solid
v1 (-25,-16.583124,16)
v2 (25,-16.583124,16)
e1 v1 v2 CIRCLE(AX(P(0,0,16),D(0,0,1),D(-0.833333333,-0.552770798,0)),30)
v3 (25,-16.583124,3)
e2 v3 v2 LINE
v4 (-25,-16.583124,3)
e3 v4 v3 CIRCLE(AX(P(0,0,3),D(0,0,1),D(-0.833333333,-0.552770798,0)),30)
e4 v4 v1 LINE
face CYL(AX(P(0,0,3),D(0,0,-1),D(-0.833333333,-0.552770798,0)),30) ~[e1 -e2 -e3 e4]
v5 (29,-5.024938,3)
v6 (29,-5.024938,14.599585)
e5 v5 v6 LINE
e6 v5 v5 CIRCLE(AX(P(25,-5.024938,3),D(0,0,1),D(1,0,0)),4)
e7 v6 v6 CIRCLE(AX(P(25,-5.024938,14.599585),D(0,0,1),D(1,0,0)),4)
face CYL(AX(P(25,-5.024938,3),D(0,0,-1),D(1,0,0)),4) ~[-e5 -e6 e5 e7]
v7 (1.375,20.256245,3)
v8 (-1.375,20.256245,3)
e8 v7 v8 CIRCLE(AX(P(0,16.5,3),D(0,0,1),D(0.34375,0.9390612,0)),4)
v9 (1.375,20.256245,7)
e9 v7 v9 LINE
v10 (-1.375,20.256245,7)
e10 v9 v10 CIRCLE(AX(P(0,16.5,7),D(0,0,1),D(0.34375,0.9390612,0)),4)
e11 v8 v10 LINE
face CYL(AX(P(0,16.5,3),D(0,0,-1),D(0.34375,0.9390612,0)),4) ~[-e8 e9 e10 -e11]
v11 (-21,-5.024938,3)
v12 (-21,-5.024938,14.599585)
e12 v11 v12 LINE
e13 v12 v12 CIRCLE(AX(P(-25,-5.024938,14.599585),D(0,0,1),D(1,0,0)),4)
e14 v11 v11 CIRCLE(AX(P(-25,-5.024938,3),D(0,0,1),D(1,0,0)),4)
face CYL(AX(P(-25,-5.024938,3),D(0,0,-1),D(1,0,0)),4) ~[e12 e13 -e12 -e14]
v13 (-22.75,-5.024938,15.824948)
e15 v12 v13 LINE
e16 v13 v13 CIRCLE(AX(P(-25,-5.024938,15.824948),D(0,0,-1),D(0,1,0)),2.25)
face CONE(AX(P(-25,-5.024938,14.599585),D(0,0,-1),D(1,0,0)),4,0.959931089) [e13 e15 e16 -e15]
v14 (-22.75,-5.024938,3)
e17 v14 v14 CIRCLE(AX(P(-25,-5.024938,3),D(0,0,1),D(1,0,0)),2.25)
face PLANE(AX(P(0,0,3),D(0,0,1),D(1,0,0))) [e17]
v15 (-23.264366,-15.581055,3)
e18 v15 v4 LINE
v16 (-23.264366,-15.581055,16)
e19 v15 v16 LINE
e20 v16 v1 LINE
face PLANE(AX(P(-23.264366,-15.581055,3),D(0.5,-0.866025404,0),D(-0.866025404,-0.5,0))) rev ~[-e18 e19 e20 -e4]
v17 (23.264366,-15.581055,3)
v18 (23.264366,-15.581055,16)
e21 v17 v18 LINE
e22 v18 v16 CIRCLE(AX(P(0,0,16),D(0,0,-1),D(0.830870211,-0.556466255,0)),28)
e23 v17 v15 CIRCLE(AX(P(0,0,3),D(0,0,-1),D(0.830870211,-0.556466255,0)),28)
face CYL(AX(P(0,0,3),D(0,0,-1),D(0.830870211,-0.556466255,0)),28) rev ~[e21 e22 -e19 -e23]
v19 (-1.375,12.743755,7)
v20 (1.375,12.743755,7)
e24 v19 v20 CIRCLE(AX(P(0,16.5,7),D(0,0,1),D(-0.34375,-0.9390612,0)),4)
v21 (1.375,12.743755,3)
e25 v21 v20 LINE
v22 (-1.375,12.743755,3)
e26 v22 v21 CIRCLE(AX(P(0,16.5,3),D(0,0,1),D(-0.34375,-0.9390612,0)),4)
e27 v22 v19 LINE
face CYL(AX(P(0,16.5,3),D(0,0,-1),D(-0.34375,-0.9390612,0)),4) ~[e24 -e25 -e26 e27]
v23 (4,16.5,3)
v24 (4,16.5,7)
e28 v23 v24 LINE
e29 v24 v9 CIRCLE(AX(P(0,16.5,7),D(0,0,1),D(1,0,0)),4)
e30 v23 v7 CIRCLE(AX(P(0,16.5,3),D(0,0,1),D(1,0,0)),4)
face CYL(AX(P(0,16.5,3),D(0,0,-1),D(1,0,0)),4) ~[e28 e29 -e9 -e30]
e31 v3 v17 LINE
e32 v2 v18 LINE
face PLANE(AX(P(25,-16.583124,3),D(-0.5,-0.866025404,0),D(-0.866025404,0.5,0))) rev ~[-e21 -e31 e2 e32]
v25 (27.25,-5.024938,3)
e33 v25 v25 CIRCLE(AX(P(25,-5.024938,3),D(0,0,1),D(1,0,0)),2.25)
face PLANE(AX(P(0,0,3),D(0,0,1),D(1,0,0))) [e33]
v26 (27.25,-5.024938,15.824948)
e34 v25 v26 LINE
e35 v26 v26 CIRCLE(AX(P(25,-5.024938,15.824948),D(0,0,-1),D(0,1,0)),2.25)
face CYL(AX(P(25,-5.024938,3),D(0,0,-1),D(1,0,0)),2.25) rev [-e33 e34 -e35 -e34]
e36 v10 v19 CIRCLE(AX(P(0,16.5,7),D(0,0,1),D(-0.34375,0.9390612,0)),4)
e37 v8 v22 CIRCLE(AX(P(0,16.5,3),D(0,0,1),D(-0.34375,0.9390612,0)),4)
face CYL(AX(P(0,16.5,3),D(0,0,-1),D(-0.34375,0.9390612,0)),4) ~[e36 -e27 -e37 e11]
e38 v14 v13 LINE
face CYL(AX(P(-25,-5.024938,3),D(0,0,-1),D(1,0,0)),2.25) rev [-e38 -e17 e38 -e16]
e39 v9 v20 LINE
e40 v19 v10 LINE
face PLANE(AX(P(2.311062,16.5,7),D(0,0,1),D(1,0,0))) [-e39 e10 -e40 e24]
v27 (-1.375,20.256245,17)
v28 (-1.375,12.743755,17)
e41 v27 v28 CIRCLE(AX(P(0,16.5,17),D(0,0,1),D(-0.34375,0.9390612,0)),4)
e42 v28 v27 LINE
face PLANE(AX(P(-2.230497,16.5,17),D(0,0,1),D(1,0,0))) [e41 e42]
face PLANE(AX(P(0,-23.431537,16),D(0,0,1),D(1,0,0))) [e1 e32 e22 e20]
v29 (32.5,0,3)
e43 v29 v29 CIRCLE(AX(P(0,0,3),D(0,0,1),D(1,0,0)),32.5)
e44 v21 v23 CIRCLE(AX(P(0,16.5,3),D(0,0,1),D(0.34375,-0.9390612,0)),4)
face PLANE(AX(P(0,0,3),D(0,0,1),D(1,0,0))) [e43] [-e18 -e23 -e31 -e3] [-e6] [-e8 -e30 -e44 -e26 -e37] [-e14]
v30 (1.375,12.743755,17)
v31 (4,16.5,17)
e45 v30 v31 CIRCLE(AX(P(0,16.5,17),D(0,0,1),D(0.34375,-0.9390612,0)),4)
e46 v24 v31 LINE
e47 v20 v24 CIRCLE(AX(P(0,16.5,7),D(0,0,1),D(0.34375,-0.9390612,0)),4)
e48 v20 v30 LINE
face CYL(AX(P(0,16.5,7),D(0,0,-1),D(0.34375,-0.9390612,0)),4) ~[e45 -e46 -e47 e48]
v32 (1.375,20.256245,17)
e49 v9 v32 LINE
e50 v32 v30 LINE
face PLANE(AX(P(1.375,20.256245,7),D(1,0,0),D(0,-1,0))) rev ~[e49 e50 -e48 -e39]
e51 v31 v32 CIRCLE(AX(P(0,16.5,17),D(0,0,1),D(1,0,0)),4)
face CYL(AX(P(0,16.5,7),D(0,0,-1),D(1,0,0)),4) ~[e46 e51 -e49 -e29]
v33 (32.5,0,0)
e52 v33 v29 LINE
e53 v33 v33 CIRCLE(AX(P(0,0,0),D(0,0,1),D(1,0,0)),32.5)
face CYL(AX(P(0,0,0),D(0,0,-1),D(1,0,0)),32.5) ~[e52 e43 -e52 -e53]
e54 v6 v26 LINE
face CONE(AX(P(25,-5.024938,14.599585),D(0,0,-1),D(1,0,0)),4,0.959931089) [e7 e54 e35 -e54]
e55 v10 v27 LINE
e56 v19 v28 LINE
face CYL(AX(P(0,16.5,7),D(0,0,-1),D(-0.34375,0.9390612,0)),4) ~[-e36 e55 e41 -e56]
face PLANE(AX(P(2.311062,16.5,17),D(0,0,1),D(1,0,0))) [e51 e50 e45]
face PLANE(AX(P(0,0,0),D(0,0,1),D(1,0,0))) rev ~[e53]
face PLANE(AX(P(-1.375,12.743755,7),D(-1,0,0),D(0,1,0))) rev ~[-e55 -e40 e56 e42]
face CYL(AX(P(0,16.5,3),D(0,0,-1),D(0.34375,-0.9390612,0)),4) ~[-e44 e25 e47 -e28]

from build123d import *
from build123d import SkipClean  # not in build123d's __all__

# Parameters (mm, degrees)
F0_R     = 32.5
F0_R_2   = 4
F0_R_3   = 2.25
F1_DEPTH = 3
F2_START = 3
F2_DEPTH = 13
F3_START = 3
F3_DEPTH = 13
F5_START = 3
F5_DEPTH = 4
F6_START = 7
F6_DEPTH = 10


# Not quite as in the source:
# - a fillet or chamfer that OpenCascade refuses, or shapes differently, is made with other operations: its cross-section is extruded or revolved along the edge and cut away or added


with BuildPart() as f1:
    # F0 (on Top) → F1 (new body)
    with BuildSketch(Plane.XY):
        Circle(F0_R)
        with Locations((-25, -5.0249378106)):
            Circle(F0_R_2, mode=Mode.SUBTRACT)
        with BuildLine():
            ThreePointArc((25, -16.5831239518), (0, -30), (-25, -16.5831239518))
            Line((-25, -16.5831239518), (-23.2643659014, -15.5810551377))
            Line((-23.2643659014, -15.5810551377), (23.2643659014, -15.5810551377))
            Line((23.2643659014, -15.5810551377), (25, -16.5831239518))
        make_face(mode=Mode.SUBTRACT)
        with Locations((25, -5.0249378106)):
            Circle(F0_R_2, mode=Mode.SUBTRACT)
        with BuildLine():
            ThreePointArc((1.375, 20.2562448003), (3.2787192622, 18.7912878475), (4, 16.5))
            ThreePointArc((4, 16.5), (3.2787192622, 14.2087121525), (1.375, 12.7437551997))
            ThreePointArc((1.375, 12.7437551997), (0, 12.5), (-1.375, 12.7437551997))
            ThreePointArc((-1.375, 12.7437551997), (-4, 16.5), (-1.375, 20.2562448003))
            ThreePointArc((-1.375, 20.2562448003), (0, 20.5), (1.375, 20.2562448003))
        make_face(mode=Mode.SUBTRACT)
        with BuildLine():
            Line((23.2643659014, -15.5810551377), (-23.2643659014, -15.5810551377))
            ThreePointArc((-23.2643659014, -15.5810551377), (0, -28), (23.2643659014, -15.5810551377))
        make_face()
        with BuildLine():
            Line((-23.2643659014, -15.5810551377), (-25, -16.5831239518))
            ThreePointArc((-25, -16.5831239518), (0, -30), (25, -16.5831239518))
            Line((25, -16.5831239518), (23.2643659014, -15.5810551377))
            ThreePointArc((23.2643659014, -15.5810551377), (0, -28), (-23.2643659014, -15.5810551377))
        make_face()
        with Locations((25, -5.0249378106)):
            Circle(F0_R_2)
        with Locations((25, -5.0249378106)):
            Circle(F0_R_3, mode=Mode.SUBTRACT)
        with Locations((-25, -5.0249378106)):
            Circle(F0_R_2)
        with Locations((-25, -5.0249378106)):
            Circle(F0_R_3, mode=Mode.SUBTRACT)
        with BuildLine():
            Line((1.375, 12.7437551997), (1.375, 20.2562448003))
            ThreePointArc((1.375, 20.2562448003), (0, 20.5), (-1.375, 20.2562448003))
            Line((-1.375, 20.2562448003), (-1.375, 12.7437551997))
            ThreePointArc((-1.375, 12.7437551997), (0, 12.5), (1.375, 12.7437551997))
        make_face()
        with Locations((25, -5.0249378106)):
            Circle(F0_R_3)
        with Locations((-25, -5.0249378106)):
            Circle(F0_R_3)
        with BuildLine():
            ThreePointArc((1.375, 12.7437551997), (3.2787192622, 14.2087121525), (4, 16.5))
            ThreePointArc((4, 16.5), (3.2787192622, 18.7912878475), (1.375, 20.2562448003))
            Line((1.375, 20.2562448003), (1.375, 12.7437551997))
        make_face()
        with BuildLine():
            Line((-1.375, 12.7437551997), (-1.375, 20.2562448003))
            ThreePointArc((-1.375, 20.2562448003), (-4, 16.5), (-1.375, 12.7437551997))
        make_face()
    extrude(amount=F1_DEPTH)

    # F0 (on Top) → F2 (join)
    with BuildSketch(Plane.XY.offset(F2_START)):
        with BuildLine():
            Line((-23.2643659014, -15.5810551377), (-25, -16.5831239518))
            ThreePointArc((-25, -16.5831239518), (0, -30), (25, -16.5831239518))
            Line((25, -16.5831239518), (23.2643659014, -15.5810551377))
            ThreePointArc((23.2643659014, -15.5810551377), (0, -28), (-23.2643659014, -15.5810551377))
        make_face()
    extrude(amount=F2_DEPTH)

    # F0 (on Top) → F3 (join)
    with BuildSketch(Plane.XY.offset(F3_START)):
        with Locations((-25, -5.0249378106)):
            Circle(F0_R_2)
        with Locations((-25, -5.0249378106)):
            Circle(F0_R_3, mode=Mode.SUBTRACT)
        with Locations((25, -5.0249378106)):
            Circle(F0_R_2)
        with Locations((25, -5.0249378106)):
            Circle(F0_R_3, mode=Mode.SUBTRACT)
    extrude(amount=F3_DEPTH)

    # F4: chamfer of 2 x 1.4004150764 on 2 edges, made by hand

    # F4_s1 → F4_t2 (revolve, cut)
    with BuildSketch(Plane.XZ.offset(5.0249378106)):
        Polygon((-21, 14.5995849236), (-23, 16), (-21, 16), align=None)
    revolve(axis=Axis((-25, -5.0249378106, 16), (0, 0, 1)), mode=Mode.SUBTRACT)

    # F4_s3 → F4_t4 (revolve, cut)
    with BuildSketch(Plane.XZ.offset(5.0249378106)):
        Polygon((29, 14.5995849236), (27, 16), (29, 16), align=None)
    revolve(axis=Axis((25, -5.0249378106, 16), (0, 0, 1)), mode=Mode.SUBTRACT)

    # F0 (on Top) → F5 (join)
    with BuildSketch(Plane.XY.offset(F5_START)):
        with BuildLine():
            ThreePointArc((1.375, 12.7437551997), (3.2787192622, 14.2087121525), (4, 16.5))
            ThreePointArc((4, 16.5), (3.2787192622, 18.7912878475), (1.375, 20.2562448003))
            Line((1.375, 20.2562448003), (1.375, 12.7437551997))
        make_face()
        with BuildLine():
            Line((-1.375, 12.7437551997), (-1.375, 20.2562448003))
            ThreePointArc((-1.375, 20.2562448003), (-4, 16.5), (-1.375, 12.7437551997))
        make_face()
        with BuildLine():
            Line((1.375, 12.7437551997), (1.375, 20.2562448003))
            ThreePointArc((1.375, 20.2562448003), (0, 20.5), (-1.375, 20.2562448003))
            Line((-1.375, 20.2562448003), (-1.375, 12.7437551997))
            ThreePointArc((-1.375, 12.7437551997), (0, 12.5), (1.375, 12.7437551997))
        make_face()
    extrude(amount=F5_DEPTH)

    # F0 (on Top) → F6 (join)
    with BuildSketch(Plane.XY.offset(F6_START)):
        with BuildLine():
            Line((-1.375, 12.7437551997), (-1.375, 20.2562448003))
            ThreePointArc((-1.375, 20.2562448003), (-4, 16.5), (-1.375, 12.7437551997))
        make_face()
        with BuildLine():
            ThreePointArc((1.375, 12.7437551997), (3.2787192622, 14.2087121525), (4, 16.5))
            ThreePointArc((4, 16.5), (3.2787192622, 18.7912878475), (1.375, 20.2562448003))
            Line((1.375, 20.2562448003), (1.375, 12.7437551997))
        make_face()
    with SkipClean():  # cleaning this boolean's faces spoils the solid; the shape is the same uncleaned
        extrude(amount=F6_DEPTH)


solid = f1.part
